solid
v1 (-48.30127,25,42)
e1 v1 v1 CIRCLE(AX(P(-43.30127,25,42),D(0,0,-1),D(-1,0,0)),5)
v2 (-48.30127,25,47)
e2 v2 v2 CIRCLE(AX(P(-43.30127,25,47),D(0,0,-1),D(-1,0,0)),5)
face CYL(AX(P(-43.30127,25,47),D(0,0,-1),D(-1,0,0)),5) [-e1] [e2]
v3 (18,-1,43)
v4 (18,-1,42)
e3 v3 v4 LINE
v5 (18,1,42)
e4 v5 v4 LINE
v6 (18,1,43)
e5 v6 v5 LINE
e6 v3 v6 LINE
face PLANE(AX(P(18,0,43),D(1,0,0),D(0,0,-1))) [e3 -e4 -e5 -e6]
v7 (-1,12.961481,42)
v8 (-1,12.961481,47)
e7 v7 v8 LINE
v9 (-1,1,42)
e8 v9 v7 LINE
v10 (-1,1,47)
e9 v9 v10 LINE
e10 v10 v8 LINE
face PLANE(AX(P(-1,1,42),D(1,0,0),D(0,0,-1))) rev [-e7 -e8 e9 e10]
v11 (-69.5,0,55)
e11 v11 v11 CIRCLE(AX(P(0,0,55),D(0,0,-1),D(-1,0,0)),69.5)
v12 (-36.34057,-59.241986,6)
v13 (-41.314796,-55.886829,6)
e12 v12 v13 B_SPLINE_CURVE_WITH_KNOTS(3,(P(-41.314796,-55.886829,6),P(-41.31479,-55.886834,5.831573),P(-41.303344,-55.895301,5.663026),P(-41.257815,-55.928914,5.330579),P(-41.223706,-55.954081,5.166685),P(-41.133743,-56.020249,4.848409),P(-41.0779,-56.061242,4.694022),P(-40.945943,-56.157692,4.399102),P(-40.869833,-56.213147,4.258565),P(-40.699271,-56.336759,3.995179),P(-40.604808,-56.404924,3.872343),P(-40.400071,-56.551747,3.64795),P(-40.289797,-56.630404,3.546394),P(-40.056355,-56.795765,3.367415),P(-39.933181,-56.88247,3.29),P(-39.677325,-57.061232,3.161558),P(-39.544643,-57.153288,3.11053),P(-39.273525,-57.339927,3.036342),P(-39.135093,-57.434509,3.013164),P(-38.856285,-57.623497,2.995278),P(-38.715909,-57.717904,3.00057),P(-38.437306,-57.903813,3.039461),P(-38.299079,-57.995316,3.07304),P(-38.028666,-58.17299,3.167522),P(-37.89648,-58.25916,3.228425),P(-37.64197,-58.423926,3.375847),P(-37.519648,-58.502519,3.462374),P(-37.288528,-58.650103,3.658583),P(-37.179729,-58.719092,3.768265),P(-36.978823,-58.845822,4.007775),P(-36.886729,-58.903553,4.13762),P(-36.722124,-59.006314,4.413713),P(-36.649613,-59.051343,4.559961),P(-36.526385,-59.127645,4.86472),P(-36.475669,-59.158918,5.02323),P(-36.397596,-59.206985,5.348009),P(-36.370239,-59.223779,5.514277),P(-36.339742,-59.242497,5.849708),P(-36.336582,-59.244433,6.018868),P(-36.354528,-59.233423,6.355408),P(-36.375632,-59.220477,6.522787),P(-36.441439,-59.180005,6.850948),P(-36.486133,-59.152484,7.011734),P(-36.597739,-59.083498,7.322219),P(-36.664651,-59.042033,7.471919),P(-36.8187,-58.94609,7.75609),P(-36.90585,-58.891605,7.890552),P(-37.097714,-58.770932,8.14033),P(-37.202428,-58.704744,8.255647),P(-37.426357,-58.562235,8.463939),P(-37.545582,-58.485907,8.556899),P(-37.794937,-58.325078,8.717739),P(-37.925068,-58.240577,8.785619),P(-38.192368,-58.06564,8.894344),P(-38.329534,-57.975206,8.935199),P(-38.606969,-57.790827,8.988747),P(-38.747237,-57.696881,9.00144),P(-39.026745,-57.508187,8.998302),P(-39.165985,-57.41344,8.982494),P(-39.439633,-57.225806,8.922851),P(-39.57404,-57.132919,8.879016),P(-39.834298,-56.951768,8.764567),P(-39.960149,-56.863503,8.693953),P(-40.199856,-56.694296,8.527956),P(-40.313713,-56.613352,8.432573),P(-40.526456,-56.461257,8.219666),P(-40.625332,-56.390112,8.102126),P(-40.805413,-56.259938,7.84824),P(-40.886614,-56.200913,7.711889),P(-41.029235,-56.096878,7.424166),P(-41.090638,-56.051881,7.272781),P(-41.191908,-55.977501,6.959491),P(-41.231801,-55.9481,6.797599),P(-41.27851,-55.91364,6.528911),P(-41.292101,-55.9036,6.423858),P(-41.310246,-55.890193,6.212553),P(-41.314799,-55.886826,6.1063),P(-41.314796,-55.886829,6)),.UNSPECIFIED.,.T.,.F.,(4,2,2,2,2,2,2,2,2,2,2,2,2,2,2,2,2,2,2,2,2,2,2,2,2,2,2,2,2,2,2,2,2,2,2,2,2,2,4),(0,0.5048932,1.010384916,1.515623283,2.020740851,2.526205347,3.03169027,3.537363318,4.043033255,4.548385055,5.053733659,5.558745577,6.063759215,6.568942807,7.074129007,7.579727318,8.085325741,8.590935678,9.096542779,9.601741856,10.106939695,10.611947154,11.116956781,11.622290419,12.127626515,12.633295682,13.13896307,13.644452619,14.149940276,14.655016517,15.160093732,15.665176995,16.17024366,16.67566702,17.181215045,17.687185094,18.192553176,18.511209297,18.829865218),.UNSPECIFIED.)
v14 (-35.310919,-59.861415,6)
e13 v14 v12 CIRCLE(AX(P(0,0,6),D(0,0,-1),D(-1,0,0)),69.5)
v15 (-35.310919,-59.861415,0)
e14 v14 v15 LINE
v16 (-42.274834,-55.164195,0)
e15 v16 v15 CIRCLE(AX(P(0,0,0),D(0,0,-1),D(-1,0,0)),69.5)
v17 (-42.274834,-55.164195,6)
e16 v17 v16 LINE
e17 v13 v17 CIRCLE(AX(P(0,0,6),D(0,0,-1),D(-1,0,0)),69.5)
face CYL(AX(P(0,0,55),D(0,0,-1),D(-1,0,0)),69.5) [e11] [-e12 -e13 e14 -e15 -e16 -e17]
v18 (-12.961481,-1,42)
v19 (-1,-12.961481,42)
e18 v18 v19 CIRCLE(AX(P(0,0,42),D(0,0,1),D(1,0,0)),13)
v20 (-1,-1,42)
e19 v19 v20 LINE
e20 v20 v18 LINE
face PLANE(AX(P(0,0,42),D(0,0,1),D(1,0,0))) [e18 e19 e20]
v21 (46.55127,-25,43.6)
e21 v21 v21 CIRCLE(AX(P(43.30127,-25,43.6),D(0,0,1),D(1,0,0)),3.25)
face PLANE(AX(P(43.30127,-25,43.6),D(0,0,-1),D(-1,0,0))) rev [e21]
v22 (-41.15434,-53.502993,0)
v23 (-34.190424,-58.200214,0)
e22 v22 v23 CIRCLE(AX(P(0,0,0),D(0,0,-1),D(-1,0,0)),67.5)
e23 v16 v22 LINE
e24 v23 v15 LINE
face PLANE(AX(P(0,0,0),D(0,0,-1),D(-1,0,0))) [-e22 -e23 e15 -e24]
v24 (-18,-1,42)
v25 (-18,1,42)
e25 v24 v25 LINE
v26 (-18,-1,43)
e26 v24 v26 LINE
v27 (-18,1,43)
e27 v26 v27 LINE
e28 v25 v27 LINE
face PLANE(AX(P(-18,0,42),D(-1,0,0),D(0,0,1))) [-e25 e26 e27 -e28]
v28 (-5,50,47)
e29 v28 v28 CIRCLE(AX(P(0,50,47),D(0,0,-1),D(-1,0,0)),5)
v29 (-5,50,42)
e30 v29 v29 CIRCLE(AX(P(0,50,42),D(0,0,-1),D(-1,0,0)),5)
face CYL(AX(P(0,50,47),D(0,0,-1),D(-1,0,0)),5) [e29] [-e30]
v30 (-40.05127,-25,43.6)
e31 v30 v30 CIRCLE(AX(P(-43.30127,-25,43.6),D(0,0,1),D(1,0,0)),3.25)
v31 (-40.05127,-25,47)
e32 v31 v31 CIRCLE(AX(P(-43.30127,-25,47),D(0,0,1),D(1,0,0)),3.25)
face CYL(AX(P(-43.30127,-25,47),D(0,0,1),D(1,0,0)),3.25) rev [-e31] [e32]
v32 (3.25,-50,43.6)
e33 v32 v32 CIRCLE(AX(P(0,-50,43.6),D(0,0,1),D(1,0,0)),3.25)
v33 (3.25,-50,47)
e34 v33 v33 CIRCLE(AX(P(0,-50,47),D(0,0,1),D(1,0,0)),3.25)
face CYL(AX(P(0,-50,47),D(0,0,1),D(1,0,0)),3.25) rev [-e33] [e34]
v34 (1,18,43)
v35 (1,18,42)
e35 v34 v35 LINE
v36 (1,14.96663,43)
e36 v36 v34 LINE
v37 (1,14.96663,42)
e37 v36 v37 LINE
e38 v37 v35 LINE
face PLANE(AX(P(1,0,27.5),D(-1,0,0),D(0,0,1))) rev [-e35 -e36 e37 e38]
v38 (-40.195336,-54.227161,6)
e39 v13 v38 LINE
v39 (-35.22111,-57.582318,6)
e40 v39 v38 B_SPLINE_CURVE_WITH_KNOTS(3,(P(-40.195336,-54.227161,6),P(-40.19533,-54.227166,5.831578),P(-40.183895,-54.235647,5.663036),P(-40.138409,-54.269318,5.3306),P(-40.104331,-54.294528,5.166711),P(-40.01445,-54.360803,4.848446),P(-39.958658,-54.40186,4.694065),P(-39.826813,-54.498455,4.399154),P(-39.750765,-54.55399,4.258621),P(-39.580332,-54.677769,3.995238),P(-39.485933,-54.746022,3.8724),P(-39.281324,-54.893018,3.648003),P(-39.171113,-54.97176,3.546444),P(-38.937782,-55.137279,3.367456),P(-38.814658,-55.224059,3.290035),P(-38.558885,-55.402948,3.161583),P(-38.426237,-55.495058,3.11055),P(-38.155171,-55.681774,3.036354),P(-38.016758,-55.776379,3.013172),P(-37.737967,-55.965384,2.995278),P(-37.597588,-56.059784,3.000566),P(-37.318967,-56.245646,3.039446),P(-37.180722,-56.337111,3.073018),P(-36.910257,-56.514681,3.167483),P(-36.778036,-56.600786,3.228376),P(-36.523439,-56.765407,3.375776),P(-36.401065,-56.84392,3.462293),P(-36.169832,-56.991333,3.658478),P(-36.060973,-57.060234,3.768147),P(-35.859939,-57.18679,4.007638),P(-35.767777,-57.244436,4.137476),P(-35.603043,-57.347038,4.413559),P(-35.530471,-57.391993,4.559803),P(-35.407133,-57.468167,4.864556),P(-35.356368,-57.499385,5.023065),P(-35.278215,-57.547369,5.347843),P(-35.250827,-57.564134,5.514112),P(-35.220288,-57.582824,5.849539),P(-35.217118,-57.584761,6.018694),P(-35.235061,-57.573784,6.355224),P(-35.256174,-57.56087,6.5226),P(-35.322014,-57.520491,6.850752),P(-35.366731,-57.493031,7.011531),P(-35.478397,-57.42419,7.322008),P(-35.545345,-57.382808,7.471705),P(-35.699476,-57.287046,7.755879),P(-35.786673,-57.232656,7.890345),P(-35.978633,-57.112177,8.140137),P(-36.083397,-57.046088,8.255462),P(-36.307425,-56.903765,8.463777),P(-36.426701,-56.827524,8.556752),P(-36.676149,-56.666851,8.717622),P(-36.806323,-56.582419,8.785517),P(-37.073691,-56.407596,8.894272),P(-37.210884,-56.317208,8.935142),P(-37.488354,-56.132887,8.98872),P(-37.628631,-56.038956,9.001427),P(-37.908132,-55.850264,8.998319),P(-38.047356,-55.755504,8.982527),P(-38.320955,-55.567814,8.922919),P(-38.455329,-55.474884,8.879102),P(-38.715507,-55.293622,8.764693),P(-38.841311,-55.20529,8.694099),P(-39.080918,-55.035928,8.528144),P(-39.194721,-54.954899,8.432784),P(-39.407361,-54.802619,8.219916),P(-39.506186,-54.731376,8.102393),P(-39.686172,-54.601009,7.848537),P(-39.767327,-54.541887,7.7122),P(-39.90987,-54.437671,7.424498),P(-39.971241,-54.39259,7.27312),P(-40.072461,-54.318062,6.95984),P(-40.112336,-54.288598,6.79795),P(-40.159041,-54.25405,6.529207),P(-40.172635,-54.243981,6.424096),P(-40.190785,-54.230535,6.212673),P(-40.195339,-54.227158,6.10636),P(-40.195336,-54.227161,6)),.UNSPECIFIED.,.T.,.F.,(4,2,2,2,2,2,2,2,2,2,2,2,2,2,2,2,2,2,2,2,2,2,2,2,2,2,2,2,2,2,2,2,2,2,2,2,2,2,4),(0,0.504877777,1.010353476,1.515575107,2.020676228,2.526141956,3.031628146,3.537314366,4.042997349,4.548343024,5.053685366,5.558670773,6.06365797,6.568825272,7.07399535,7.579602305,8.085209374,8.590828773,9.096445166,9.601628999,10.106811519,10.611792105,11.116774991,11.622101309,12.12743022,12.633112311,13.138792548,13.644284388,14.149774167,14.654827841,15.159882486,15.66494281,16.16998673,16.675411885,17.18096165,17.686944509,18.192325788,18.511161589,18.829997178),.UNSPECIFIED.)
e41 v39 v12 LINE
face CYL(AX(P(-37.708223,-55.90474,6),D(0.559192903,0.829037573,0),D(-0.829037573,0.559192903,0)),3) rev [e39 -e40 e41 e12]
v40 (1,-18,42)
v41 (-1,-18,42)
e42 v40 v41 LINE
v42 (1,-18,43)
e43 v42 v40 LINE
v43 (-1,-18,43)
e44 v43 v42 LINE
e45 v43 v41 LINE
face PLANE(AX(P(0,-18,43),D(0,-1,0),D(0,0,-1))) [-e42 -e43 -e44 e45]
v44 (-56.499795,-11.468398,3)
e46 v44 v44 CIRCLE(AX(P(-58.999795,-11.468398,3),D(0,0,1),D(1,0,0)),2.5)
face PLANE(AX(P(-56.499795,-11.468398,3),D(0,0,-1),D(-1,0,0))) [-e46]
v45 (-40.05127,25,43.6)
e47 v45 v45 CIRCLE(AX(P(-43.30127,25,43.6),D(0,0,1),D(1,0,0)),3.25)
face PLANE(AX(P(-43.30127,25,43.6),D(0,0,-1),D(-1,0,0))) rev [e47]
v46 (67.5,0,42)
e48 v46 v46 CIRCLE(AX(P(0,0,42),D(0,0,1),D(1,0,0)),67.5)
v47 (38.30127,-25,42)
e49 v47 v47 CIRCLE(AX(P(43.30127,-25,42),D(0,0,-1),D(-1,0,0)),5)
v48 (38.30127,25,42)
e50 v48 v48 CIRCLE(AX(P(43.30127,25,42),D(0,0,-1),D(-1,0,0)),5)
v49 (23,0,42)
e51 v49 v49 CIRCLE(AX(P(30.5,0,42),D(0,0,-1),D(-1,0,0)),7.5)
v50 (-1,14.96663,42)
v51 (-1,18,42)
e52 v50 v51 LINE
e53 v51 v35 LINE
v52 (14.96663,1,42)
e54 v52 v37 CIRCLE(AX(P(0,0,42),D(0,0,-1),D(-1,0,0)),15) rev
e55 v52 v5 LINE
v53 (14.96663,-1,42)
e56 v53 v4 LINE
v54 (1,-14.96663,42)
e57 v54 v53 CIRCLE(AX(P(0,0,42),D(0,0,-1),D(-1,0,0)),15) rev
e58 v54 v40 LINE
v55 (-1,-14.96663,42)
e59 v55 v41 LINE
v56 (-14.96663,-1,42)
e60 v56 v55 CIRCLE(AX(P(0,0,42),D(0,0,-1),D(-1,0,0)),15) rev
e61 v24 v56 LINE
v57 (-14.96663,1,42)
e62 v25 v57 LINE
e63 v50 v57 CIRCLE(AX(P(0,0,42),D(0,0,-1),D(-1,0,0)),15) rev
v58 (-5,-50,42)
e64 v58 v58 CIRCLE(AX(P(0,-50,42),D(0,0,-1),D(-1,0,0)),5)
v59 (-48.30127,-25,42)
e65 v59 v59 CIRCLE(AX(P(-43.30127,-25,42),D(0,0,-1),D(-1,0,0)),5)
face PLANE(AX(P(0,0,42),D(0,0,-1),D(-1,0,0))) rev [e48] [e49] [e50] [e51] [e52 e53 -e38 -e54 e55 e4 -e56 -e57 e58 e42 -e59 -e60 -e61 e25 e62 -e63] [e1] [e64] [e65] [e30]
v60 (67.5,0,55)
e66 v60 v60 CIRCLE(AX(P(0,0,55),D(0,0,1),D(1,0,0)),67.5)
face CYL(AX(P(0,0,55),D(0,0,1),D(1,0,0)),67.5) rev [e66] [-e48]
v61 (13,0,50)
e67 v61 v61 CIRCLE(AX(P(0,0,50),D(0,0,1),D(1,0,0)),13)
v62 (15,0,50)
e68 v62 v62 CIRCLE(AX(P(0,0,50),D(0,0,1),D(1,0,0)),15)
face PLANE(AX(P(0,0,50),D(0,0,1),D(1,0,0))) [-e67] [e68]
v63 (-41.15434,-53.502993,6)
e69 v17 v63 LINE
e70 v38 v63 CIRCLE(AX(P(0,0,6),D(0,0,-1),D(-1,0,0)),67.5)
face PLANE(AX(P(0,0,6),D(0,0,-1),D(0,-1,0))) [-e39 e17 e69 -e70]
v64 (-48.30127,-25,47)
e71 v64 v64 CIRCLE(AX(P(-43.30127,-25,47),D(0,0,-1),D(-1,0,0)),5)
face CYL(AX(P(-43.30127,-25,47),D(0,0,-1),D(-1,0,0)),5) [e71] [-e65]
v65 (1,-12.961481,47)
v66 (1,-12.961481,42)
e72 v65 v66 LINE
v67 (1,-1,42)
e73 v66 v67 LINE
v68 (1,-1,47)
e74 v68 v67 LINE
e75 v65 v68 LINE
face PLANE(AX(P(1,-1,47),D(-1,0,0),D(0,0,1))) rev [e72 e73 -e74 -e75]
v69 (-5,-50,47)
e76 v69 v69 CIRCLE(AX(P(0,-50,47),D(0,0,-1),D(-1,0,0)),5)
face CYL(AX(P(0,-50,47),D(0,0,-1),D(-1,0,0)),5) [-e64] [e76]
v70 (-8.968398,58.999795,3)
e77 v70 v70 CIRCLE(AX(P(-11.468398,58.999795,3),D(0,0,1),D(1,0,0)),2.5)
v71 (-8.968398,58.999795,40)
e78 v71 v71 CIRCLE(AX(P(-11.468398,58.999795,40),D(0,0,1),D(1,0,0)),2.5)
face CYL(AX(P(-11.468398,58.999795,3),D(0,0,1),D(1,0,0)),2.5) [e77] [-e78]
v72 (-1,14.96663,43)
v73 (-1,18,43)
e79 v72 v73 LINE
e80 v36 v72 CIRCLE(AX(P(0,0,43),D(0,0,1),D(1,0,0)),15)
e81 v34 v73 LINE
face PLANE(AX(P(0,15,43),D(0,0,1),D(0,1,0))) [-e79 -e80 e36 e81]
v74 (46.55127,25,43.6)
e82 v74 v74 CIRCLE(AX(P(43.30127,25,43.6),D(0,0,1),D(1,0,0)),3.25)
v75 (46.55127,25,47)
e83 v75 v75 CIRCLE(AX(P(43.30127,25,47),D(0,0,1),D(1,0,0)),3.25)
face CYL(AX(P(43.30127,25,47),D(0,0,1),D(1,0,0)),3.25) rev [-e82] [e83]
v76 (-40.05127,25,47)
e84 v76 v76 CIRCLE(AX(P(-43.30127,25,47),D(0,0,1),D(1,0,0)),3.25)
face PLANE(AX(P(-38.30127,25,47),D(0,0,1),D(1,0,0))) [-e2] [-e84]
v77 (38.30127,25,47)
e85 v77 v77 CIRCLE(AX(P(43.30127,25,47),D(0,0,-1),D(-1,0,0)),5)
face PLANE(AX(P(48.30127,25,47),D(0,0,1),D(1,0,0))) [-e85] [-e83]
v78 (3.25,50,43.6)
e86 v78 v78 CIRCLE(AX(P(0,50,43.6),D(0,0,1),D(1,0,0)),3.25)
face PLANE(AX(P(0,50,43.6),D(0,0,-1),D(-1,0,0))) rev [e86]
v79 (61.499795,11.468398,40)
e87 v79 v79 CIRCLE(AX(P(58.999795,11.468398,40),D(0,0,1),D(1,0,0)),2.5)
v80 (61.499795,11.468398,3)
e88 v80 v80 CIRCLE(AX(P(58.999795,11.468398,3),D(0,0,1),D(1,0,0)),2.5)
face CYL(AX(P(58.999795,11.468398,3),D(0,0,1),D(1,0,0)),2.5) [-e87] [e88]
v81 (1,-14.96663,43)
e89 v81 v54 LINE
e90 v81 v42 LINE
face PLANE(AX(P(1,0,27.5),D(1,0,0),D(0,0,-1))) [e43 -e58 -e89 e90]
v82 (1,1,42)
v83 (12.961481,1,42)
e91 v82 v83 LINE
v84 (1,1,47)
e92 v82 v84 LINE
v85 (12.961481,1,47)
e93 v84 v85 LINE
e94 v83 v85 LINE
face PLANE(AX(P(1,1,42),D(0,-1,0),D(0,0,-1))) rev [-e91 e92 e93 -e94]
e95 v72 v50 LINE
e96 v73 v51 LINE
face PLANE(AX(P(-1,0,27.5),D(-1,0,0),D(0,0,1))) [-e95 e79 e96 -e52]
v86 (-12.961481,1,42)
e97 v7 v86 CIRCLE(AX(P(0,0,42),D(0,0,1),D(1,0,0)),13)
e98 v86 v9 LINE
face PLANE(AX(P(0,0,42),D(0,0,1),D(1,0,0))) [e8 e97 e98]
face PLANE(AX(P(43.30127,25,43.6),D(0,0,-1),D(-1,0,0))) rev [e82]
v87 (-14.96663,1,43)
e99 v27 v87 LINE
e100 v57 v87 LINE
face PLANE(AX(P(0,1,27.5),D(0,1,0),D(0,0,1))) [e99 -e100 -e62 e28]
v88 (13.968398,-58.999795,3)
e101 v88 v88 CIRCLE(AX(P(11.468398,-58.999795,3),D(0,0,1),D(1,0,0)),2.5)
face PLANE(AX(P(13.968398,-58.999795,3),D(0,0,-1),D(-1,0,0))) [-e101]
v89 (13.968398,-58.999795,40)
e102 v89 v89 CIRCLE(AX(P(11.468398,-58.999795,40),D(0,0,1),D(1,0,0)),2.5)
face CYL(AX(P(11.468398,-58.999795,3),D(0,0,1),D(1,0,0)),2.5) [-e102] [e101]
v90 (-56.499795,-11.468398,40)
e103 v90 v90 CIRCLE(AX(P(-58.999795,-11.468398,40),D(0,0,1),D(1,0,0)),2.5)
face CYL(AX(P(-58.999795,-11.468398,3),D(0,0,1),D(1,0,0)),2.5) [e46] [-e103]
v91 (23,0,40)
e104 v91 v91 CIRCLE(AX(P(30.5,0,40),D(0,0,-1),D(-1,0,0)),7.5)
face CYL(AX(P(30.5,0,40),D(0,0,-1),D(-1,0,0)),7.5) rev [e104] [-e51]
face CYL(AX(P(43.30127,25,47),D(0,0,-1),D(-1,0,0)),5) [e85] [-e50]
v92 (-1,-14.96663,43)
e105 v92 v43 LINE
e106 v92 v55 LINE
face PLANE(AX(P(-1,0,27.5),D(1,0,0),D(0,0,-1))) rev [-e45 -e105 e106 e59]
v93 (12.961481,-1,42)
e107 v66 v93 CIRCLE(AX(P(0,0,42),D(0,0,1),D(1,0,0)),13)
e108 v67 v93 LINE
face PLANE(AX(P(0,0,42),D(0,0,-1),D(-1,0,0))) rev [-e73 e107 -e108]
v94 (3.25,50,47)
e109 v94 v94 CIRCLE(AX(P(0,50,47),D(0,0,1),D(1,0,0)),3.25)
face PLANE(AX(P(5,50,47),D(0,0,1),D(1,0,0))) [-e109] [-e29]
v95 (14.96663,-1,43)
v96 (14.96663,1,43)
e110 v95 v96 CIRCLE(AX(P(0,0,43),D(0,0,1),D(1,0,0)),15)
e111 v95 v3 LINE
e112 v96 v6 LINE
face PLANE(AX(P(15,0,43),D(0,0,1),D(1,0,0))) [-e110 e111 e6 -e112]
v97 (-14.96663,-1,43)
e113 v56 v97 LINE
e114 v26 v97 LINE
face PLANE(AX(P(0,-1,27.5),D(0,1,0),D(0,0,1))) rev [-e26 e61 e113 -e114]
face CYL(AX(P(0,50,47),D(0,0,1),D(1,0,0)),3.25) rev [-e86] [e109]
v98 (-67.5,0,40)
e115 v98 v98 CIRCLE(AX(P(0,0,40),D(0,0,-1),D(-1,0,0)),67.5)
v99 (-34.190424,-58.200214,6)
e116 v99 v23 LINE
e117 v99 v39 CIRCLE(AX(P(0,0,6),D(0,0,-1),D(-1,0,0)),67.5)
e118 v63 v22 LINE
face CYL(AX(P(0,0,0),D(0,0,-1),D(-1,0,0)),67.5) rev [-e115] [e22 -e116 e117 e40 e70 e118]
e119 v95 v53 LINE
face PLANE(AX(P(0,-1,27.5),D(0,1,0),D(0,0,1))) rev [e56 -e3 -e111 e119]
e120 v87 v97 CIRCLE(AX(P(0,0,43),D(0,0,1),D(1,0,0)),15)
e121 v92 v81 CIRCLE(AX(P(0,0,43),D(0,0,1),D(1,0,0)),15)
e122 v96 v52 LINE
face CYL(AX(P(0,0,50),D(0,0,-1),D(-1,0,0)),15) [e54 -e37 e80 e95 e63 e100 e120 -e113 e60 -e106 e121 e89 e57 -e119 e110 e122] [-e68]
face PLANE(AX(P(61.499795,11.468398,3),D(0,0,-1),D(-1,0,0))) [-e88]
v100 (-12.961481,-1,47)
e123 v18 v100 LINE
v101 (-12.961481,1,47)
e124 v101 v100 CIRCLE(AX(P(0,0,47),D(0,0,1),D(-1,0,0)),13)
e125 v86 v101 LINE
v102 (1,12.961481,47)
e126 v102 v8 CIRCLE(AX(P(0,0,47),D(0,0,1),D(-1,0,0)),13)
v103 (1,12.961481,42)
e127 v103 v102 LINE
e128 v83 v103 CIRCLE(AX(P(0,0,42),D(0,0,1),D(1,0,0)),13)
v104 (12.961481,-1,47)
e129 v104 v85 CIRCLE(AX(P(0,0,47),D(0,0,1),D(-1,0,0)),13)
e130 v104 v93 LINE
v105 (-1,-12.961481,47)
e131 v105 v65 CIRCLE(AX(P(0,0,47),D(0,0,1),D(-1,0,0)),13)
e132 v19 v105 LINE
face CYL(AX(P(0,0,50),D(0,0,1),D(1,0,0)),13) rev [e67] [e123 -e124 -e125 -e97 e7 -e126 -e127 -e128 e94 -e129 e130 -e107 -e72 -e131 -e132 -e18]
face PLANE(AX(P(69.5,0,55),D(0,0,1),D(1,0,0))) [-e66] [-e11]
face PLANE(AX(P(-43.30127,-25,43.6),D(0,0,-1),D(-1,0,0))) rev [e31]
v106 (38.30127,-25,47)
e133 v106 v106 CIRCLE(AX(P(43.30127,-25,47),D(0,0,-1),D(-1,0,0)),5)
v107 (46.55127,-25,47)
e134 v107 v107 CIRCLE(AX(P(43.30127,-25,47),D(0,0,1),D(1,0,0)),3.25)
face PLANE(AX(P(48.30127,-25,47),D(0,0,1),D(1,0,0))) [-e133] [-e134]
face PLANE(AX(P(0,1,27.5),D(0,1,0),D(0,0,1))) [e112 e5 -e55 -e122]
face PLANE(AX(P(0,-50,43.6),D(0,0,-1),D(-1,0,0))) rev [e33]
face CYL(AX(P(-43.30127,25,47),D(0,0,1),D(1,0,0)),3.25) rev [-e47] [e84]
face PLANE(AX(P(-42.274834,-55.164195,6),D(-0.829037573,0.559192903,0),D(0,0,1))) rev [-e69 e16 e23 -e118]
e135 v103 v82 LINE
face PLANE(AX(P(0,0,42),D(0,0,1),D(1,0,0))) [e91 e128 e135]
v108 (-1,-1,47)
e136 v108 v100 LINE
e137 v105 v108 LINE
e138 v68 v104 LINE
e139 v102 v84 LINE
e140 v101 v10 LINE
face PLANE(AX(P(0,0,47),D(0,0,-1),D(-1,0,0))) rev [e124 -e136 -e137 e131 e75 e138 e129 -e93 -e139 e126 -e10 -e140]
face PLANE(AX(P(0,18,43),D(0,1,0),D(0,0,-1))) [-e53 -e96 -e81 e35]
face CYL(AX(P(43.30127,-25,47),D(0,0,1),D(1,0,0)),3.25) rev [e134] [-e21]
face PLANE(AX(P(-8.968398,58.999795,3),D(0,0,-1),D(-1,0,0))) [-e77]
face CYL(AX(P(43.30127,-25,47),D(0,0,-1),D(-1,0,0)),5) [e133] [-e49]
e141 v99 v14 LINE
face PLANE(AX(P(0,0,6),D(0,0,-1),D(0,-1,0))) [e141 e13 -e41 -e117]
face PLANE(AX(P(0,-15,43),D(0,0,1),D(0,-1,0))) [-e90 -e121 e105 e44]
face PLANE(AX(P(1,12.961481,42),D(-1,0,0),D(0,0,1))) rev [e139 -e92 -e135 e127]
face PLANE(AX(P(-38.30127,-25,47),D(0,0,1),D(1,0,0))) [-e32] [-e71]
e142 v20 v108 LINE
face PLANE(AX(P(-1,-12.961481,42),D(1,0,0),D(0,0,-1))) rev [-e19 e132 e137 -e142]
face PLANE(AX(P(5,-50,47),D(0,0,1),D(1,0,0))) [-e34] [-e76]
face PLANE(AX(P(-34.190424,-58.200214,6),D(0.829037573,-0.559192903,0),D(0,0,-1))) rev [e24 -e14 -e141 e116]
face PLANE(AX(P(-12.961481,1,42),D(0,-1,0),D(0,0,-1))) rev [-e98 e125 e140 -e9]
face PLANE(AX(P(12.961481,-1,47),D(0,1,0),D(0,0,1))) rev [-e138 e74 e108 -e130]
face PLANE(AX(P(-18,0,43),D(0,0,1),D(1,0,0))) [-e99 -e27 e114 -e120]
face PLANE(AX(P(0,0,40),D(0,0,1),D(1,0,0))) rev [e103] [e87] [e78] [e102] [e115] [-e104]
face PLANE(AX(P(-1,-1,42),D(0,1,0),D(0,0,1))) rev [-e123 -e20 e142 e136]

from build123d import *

# Parameters (mm, degrees)
SKETCH_1_W                  = 69.5
SKETCH_1_H                  = 55
HOLE_WIZARD_1_D             = 135
HOLE_WIZARD_1_DEPTH         = 13
SKETCH_4_R                  = 15
EXTRUDE_1_DEPTH             = 8
HOLE_WIZARD_M22_1_D         = 26
HOLE_WIZARD_M22_1_DEPTH     = 8
EXTRUDE_2_DEPTH             = 5
CUT_EXTRUDE_START           = -5
CUT_EXTRUDE_1_DEPTH         = 5
CUT_EXTRUDE_2_DEPTH         = 5
CUT_EXTRUDE_3_DEPTH         = 5
HOLE_WIZARD_2_D             = 135
HOLE_WIZARD_2_DEPTH         = 40
THICKEN_START               = -4.2
THICKEN_1_OUTLINE_W         = 3
THICKEN_1_OUTLINE_H         = 6
THICKEN_1_DEPTH             = 8.4
SKETCH_13_W                 = 5
SKETCH_13_H                 = 5
SKETCH_14_W                 = 5
SKETCH_14_H                 = 5
SKETCH_15_W                 = 5
SKETCH_15_H                 = 5
SKETCH_16_W                 = 5
SKETCH_16_H                 = 5
SKETCH_17_W                 = 5
SKETCH_17_H                 = 5
SKETCH_18_W                 = 5
SKETCH_18_H                 = 5
SKETCH_19_W                 = 2.5
SKETCH_19_H                 = 37
SKETCH_20_W                 = 2.5
SKETCH_20_H                 = 37
SKETCH_21_W                 = 2.5
SKETCH_21_H                 = 37
SKETCH_22_W                 = 2.5
SKETCH_22_H                 = 37
HOLE_WIZARD_6_5_6_5_1_D     = 6.5
HOLE_WIZARD_6_5_6_5_1_DEPTH = 3.4
HOLE_WIZARD_15_0_15_1_D     = 15
HOLE_WIZARD_15_0_15_1_DEPTH = 15
HOLE_WIZARD_6_0_6_1_D       = 6
HOLE_WIZARD_6_0_6_1_DEPTH   = 29.048717705
RIB_START                   = -1
RIB_1_OUTLINE_W             = 1
RIB_1_OUTLINE_H             = 4
RIB_1_DEPTH                 = 2
RIB_2_OUTLINE_W             = 4
RIB_2_OUTLINE_H             = 1
RIB_2_DEPTH                 = 2
RIB_3_OUTLINE_W             = 4
RIB_3_OUTLINE_H             = 1
RIB_3_DEPTH                 = 2
RIB_4_OUTLINE_W             = 4
RIB_4_OUTLINE_H             = 1
RIB_4_DEPTH                 = 2


# Read off the part's stored shape, not the designer's step: 切除-加厚1, 筋1, 筋2, 筋3, 筋4
with BuildPart() as part:
    # 草图1 → 旋转1 (revolve)
    with BuildSketch(Plane.XZ, mode=Mode.PRIVATE) as revolve_1_sk:
        with Locations((34.75, 27.5)):
            Rectangle(SKETCH_1_W, SKETCH_1_H)
    revolve(revolve_1_sk.sketch.rotate(Axis((0, 0, 55), (0, 0, -1)), 180), axis=Axis((0, 0, 55), (0, 0, -1)))

    # 孔1
    with Locations(Plane.XY.offset(55)):
        with Locations((0, 0)):
            Hole(HOLE_WIZARD_1_D / 2, depth=HOLE_WIZARD_1_DEPTH)

    # 草图4 → 凸台-拉伸1 (add)
    with BuildSketch(Plane.XY.offset(42)):
        with Locations(Location((0, 0, 0), (0, 0, 180))):
            Circle(SKETCH_4_R)
    extrude(amount=EXTRUDE_1_DEPTH)

    # M22 间隙孔1
    with Locations(Plane.XY.offset(50)):
        with Locations((0, 0)):
            Hole(HOLE_WIZARD_M22_1_D / 2, depth=HOLE_WIZARD_M22_1_DEPTH)

    # 草图7 → 凸台-拉伸2 (add)
    with BuildSketch(Plane.XY.offset(42)):
        with BuildLine():
            Line((12.961481397, -1), (1, -1))
            Line((1, -1), (1, -12.961481397))
            ThreePointArc((1, -12.961481397), (-9.192388155, 9.192388155), (12.961481397, -1))
        make_face()
    extrude(amount=EXTRUDE_2_DEPTH)

    # 草图8 → 切除-拉伸1 (cut)
    with BuildSketch(Plane.XY.offset(47).offset(CUT_EXTRUDE_START)):
        with BuildLine():
            Line((-1, -12.961481397), (-1, -1))
            Line((-1, -1), (-12.961481397, -1))
            ThreePointArc((-12.961481397, -1), (-9.192388155, -9.192388155), (-1, -12.961481397))
        make_face()
    extrude(amount=CUT_EXTRUDE_1_DEPTH, mode=Mode.SUBTRACT)

    # 草图9 → 切除-拉伸2 (cut)
    with BuildSketch(Plane.XY.offset(47).offset(CUT_EXTRUDE_START)):
        with BuildLine():
            Line((-12.961481397, 1), (-1, 1))
            Line((-1, 1), (-1, 12.961481397))
            ThreePointArc((-1, 12.961481397), (-9.192388155, 9.192388155), (-12.961481397, 1))
        make_face()
    extrude(amount=CUT_EXTRUDE_2_DEPTH, mode=Mode.SUBTRACT)

    # 草图10 → 切除-拉伸3 (cut)
    with BuildSketch(Plane.XY.offset(47).offset(CUT_EXTRUDE_START)):
        with BuildLine():
            Line((1, 12.961481397), (1, 1))
            Line((1, 1), (12.961481397, 1))
            ThreePointArc((12.961481397, 1), (9.192388155, 9.192388155), (1, 12.961481397))
        make_face()
    extrude(amount=CUT_EXTRUDE_3_DEPTH, mode=Mode.SUBTRACT)

    # 孔2
    with Locations(Plane(origin=(0, 0, 0), x_dir=(-1, 0, 0), z_dir=(0, 0, -1))):
        with Locations((0, 0)):
            Hole(HOLE_WIZARD_2_D / 2, depth=HOLE_WIZARD_2_DEPTH)

    # 切除-加厚1 outline → 切除-加厚1 (cut)
    with BuildSketch(Plane(origin=(0, 0, 0), x_dir=(0.5591929034707426, 0.8290375725550445, 0), z_dir=(0.8290375725550445, -0.5591929034707428, 0)).offset(THICKEN_START)):
        with Locations((-68.5, 3)):
            Rectangle(THICKEN_1_OUTLINE_W, THICKEN_1_OUTLINE_H)
    extrude(amount=THICKEN_1_DEPTH, mode=Mode.SUBTRACT)

    # 草图13 → 旋转2 (revolve)
    with BuildSketch(Plane.XZ.offset(25), mode=Mode.PRIVATE) as revolve_2_sk:
        with Locations((45.801270189, 44.5)):
            Rectangle(SKETCH_13_W, SKETCH_13_H)
    revolve(revolve_2_sk.sketch.rotate(Axis((43.301270189, -25, 47), (0, 0, -1)), 180), axis=Axis((43.301270189, -25, 47), (0, 0, -1)))

    # 草图14 → 旋转3 (revolve)
    with BuildSketch(Plane.XZ.offset(-25), mode=Mode.PRIVATE) as revolve_3_sk:
        with Locations((45.801270189, 44.5)):
            Rectangle(SKETCH_14_W, SKETCH_14_H)
    revolve(revolve_3_sk.sketch.rotate(Axis((43.301270189, 25, 47), (0, 0, -1)), 180), axis=Axis((43.301270189, 25, 47), (0, 0, -1)))

    # 草图15 → 旋转4 (revolve)
    with BuildSketch(Plane.XZ.offset(-50), mode=Mode.PRIVATE) as revolve_4_sk:
        with Locations((2.5, 44.5)):
            Rectangle(SKETCH_15_W, SKETCH_15_H)
    revolve(revolve_4_sk.sketch.rotate(Axis((0, 50, 47), (0, 0, -1)), 180), axis=Axis((0, 50, 47), (0, 0, -1)))

    # 草图16 → 旋转5 (revolve)
    with BuildSketch(Plane.XZ.offset(-25), mode=Mode.PRIVATE) as revolve_5_sk:
        with Locations((-40.801270189, 44.5)):
            Rectangle(SKETCH_16_W, SKETCH_16_H)
    revolve(revolve_5_sk.sketch.rotate(Axis((-43.301270189, 25, 47), (0, 0, -1)), 180), axis=Axis((-43.301270189, 25, 47), (0, 0, -1)))

    # 草图17 → 旋转6 (revolve)
    with BuildSketch(Plane.XZ.offset(25), mode=Mode.PRIVATE) as revolve_6_sk:
        with Locations((-40.801270189, 44.5)):
            Rectangle(SKETCH_17_W, SKETCH_17_H)
    revolve(revolve_6_sk.sketch.rotate(Axis((-43.301270189, -25, 47), (0, 0, -1)), 180), axis=Axis((-43.301270189, -25, 47), (0, 0, -1)))

    # 草图18 → 旋转7 (revolve)
    with BuildSketch(Plane.XZ.offset(50), mode=Mode.PRIVATE) as revolve_7_sk:
        with Locations((2.5, 44.5)):
            Rectangle(SKETCH_18_W, SKETCH_18_H)
    revolve(revolve_7_sk.sketch.rotate(Axis((0, -50, 47), (0, 0, -1)), 180), axis=Axis((0, -50, 47), (0, 0, -1)))

    # 草图19 → 旋转8 (revolve)
    with BuildSketch(Plane(origin=(0, -11.468398436, 0), x_dir=(1, 0, 0), z_dir=(0, 1, 0))):
        with Locations((-57.749795231, -21.5)):
            Rectangle(SKETCH_19_W, SKETCH_19_H)
    revolve(axis=Axis((-58.999795231, -11.468398436, 3), (0, 0, 1)))

    # 草图20 → 旋转9 (revolve)
    with BuildSketch(Plane(origin=(0, -58.999795231, 0), x_dir=(1, 0, 0), z_dir=(0, 1, 0))):
        with Locations((12.718398436, -21.5)):
            Rectangle(SKETCH_20_W, SKETCH_20_H)
    revolve(axis=Axis((11.468398436, -58.999795231, 3), (0, 0, 1)))

    # 草图21 → 旋转10 (revolve)
    with BuildSketch(Plane(origin=(0, 58.999795231, 0), x_dir=(1, 0, 0), z_dir=(0, 1, 0))):
        with Locations((-10.218398436, -21.5)):
            Rectangle(SKETCH_21_W, SKETCH_21_H)
    revolve(axis=Axis((-11.468398436, 58.999795231, 3), (0, 0, 1)))

    # 草图22 → 旋转11 (revolve)
    with BuildSketch(Plane(origin=(0, 11.468398436, 0), x_dir=(1, 0, 0), z_dir=(0, 1, 0))):
        with Locations((60.249795231, -21.5)):
            Rectangle(SKETCH_22_W, SKETCH_22_H)
    revolve(axis=Axis((58.999795231, 11.468398436, 3), (0, 0, 1)))

    # Ø6.5 (6.5) 直径孔1
    with Locations(Plane.XY.offset(47)):
        with Locations((0, -50), (-43.301270189, -25), (-43.301270189, 25), (0, 50), (43.301270189, 25), (43.301270189, -25)):
            Hole(HOLE_WIZARD_6_5_6_5_1_D / 2, depth=HOLE_WIZARD_6_5_6_5_1_DEPTH)

    # Ø15.0 (15) 直径孔1
    with Locations(Plane(origin=(0, 0, 40), x_dir=(-1, 0, 0), z_dir=(0, 0, -1))):
        with Locations((-30.5, 0)):
            Hole(HOLE_WIZARD_15_0_15_1_D / 2, depth=HOLE_WIZARD_15_0_15_1_DEPTH)

    # Ø6.0 (6) 直径孔1
    with Locations(Plane(origin=(-37.70822303, -55.904739656, 0), x_dir=(0.8290375725550408, -0.5591929034707481, 0), z_dir=(0.5591929034707481, 0.8290375725550408, 0))):
        with Locations((0, -6)):
            Hole(HOLE_WIZARD_6_0_6_1_D / 2, depth=HOLE_WIZARD_6_0_6_1_DEPTH)

    # 筋1 outline → 筋1 (add)
    with BuildSketch(Plane(origin=(0, 0, 0), x_dir=(0, 0, -1), z_dir=(1, 0, 0)).offset(RIB_START)):
        with Locations((-42.5, -16)):
            Rectangle(RIB_1_OUTLINE_W, RIB_1_OUTLINE_H)
    extrude(amount=RIB_1_DEPTH)

    # 筋2 outline → 筋2 (add)
    with BuildSketch(Plane(origin=(0, 0, 0), x_dir=(0, -1, 0), z_dir=(-1, 0, 0)).offset(RIB_START)):
        with Locations((-16, 42.5)):
            Rectangle(RIB_2_OUTLINE_W, RIB_2_OUTLINE_H)
    extrude(amount=RIB_2_DEPTH)

    # 筋3 outline → 筋3 (add)
    with BuildSketch(Plane(origin=(0, 0, 0), x_dir=(1, 0, 0), z_dir=(0, 1, 0)).offset(RIB_START)):
        with Locations((16, -42.5)):
            Rectangle(RIB_3_OUTLINE_W, RIB_3_OUTLINE_H)
    extrude(amount=RIB_3_DEPTH)

    # 筋4 outline → 筋4 (add)
    with BuildSketch(Plane(origin=(0, 0, 0), x_dir=(1, 0, 0), z_dir=(0, 1, 0)).offset(RIB_START)):
        with Locations((-16, -42.5)):
            Rectangle(RIB_4_OUTLINE_W, RIB_4_OUTLINE_H)
    extrude(amount=RIB_4_DEPTH)


solid = part.part
